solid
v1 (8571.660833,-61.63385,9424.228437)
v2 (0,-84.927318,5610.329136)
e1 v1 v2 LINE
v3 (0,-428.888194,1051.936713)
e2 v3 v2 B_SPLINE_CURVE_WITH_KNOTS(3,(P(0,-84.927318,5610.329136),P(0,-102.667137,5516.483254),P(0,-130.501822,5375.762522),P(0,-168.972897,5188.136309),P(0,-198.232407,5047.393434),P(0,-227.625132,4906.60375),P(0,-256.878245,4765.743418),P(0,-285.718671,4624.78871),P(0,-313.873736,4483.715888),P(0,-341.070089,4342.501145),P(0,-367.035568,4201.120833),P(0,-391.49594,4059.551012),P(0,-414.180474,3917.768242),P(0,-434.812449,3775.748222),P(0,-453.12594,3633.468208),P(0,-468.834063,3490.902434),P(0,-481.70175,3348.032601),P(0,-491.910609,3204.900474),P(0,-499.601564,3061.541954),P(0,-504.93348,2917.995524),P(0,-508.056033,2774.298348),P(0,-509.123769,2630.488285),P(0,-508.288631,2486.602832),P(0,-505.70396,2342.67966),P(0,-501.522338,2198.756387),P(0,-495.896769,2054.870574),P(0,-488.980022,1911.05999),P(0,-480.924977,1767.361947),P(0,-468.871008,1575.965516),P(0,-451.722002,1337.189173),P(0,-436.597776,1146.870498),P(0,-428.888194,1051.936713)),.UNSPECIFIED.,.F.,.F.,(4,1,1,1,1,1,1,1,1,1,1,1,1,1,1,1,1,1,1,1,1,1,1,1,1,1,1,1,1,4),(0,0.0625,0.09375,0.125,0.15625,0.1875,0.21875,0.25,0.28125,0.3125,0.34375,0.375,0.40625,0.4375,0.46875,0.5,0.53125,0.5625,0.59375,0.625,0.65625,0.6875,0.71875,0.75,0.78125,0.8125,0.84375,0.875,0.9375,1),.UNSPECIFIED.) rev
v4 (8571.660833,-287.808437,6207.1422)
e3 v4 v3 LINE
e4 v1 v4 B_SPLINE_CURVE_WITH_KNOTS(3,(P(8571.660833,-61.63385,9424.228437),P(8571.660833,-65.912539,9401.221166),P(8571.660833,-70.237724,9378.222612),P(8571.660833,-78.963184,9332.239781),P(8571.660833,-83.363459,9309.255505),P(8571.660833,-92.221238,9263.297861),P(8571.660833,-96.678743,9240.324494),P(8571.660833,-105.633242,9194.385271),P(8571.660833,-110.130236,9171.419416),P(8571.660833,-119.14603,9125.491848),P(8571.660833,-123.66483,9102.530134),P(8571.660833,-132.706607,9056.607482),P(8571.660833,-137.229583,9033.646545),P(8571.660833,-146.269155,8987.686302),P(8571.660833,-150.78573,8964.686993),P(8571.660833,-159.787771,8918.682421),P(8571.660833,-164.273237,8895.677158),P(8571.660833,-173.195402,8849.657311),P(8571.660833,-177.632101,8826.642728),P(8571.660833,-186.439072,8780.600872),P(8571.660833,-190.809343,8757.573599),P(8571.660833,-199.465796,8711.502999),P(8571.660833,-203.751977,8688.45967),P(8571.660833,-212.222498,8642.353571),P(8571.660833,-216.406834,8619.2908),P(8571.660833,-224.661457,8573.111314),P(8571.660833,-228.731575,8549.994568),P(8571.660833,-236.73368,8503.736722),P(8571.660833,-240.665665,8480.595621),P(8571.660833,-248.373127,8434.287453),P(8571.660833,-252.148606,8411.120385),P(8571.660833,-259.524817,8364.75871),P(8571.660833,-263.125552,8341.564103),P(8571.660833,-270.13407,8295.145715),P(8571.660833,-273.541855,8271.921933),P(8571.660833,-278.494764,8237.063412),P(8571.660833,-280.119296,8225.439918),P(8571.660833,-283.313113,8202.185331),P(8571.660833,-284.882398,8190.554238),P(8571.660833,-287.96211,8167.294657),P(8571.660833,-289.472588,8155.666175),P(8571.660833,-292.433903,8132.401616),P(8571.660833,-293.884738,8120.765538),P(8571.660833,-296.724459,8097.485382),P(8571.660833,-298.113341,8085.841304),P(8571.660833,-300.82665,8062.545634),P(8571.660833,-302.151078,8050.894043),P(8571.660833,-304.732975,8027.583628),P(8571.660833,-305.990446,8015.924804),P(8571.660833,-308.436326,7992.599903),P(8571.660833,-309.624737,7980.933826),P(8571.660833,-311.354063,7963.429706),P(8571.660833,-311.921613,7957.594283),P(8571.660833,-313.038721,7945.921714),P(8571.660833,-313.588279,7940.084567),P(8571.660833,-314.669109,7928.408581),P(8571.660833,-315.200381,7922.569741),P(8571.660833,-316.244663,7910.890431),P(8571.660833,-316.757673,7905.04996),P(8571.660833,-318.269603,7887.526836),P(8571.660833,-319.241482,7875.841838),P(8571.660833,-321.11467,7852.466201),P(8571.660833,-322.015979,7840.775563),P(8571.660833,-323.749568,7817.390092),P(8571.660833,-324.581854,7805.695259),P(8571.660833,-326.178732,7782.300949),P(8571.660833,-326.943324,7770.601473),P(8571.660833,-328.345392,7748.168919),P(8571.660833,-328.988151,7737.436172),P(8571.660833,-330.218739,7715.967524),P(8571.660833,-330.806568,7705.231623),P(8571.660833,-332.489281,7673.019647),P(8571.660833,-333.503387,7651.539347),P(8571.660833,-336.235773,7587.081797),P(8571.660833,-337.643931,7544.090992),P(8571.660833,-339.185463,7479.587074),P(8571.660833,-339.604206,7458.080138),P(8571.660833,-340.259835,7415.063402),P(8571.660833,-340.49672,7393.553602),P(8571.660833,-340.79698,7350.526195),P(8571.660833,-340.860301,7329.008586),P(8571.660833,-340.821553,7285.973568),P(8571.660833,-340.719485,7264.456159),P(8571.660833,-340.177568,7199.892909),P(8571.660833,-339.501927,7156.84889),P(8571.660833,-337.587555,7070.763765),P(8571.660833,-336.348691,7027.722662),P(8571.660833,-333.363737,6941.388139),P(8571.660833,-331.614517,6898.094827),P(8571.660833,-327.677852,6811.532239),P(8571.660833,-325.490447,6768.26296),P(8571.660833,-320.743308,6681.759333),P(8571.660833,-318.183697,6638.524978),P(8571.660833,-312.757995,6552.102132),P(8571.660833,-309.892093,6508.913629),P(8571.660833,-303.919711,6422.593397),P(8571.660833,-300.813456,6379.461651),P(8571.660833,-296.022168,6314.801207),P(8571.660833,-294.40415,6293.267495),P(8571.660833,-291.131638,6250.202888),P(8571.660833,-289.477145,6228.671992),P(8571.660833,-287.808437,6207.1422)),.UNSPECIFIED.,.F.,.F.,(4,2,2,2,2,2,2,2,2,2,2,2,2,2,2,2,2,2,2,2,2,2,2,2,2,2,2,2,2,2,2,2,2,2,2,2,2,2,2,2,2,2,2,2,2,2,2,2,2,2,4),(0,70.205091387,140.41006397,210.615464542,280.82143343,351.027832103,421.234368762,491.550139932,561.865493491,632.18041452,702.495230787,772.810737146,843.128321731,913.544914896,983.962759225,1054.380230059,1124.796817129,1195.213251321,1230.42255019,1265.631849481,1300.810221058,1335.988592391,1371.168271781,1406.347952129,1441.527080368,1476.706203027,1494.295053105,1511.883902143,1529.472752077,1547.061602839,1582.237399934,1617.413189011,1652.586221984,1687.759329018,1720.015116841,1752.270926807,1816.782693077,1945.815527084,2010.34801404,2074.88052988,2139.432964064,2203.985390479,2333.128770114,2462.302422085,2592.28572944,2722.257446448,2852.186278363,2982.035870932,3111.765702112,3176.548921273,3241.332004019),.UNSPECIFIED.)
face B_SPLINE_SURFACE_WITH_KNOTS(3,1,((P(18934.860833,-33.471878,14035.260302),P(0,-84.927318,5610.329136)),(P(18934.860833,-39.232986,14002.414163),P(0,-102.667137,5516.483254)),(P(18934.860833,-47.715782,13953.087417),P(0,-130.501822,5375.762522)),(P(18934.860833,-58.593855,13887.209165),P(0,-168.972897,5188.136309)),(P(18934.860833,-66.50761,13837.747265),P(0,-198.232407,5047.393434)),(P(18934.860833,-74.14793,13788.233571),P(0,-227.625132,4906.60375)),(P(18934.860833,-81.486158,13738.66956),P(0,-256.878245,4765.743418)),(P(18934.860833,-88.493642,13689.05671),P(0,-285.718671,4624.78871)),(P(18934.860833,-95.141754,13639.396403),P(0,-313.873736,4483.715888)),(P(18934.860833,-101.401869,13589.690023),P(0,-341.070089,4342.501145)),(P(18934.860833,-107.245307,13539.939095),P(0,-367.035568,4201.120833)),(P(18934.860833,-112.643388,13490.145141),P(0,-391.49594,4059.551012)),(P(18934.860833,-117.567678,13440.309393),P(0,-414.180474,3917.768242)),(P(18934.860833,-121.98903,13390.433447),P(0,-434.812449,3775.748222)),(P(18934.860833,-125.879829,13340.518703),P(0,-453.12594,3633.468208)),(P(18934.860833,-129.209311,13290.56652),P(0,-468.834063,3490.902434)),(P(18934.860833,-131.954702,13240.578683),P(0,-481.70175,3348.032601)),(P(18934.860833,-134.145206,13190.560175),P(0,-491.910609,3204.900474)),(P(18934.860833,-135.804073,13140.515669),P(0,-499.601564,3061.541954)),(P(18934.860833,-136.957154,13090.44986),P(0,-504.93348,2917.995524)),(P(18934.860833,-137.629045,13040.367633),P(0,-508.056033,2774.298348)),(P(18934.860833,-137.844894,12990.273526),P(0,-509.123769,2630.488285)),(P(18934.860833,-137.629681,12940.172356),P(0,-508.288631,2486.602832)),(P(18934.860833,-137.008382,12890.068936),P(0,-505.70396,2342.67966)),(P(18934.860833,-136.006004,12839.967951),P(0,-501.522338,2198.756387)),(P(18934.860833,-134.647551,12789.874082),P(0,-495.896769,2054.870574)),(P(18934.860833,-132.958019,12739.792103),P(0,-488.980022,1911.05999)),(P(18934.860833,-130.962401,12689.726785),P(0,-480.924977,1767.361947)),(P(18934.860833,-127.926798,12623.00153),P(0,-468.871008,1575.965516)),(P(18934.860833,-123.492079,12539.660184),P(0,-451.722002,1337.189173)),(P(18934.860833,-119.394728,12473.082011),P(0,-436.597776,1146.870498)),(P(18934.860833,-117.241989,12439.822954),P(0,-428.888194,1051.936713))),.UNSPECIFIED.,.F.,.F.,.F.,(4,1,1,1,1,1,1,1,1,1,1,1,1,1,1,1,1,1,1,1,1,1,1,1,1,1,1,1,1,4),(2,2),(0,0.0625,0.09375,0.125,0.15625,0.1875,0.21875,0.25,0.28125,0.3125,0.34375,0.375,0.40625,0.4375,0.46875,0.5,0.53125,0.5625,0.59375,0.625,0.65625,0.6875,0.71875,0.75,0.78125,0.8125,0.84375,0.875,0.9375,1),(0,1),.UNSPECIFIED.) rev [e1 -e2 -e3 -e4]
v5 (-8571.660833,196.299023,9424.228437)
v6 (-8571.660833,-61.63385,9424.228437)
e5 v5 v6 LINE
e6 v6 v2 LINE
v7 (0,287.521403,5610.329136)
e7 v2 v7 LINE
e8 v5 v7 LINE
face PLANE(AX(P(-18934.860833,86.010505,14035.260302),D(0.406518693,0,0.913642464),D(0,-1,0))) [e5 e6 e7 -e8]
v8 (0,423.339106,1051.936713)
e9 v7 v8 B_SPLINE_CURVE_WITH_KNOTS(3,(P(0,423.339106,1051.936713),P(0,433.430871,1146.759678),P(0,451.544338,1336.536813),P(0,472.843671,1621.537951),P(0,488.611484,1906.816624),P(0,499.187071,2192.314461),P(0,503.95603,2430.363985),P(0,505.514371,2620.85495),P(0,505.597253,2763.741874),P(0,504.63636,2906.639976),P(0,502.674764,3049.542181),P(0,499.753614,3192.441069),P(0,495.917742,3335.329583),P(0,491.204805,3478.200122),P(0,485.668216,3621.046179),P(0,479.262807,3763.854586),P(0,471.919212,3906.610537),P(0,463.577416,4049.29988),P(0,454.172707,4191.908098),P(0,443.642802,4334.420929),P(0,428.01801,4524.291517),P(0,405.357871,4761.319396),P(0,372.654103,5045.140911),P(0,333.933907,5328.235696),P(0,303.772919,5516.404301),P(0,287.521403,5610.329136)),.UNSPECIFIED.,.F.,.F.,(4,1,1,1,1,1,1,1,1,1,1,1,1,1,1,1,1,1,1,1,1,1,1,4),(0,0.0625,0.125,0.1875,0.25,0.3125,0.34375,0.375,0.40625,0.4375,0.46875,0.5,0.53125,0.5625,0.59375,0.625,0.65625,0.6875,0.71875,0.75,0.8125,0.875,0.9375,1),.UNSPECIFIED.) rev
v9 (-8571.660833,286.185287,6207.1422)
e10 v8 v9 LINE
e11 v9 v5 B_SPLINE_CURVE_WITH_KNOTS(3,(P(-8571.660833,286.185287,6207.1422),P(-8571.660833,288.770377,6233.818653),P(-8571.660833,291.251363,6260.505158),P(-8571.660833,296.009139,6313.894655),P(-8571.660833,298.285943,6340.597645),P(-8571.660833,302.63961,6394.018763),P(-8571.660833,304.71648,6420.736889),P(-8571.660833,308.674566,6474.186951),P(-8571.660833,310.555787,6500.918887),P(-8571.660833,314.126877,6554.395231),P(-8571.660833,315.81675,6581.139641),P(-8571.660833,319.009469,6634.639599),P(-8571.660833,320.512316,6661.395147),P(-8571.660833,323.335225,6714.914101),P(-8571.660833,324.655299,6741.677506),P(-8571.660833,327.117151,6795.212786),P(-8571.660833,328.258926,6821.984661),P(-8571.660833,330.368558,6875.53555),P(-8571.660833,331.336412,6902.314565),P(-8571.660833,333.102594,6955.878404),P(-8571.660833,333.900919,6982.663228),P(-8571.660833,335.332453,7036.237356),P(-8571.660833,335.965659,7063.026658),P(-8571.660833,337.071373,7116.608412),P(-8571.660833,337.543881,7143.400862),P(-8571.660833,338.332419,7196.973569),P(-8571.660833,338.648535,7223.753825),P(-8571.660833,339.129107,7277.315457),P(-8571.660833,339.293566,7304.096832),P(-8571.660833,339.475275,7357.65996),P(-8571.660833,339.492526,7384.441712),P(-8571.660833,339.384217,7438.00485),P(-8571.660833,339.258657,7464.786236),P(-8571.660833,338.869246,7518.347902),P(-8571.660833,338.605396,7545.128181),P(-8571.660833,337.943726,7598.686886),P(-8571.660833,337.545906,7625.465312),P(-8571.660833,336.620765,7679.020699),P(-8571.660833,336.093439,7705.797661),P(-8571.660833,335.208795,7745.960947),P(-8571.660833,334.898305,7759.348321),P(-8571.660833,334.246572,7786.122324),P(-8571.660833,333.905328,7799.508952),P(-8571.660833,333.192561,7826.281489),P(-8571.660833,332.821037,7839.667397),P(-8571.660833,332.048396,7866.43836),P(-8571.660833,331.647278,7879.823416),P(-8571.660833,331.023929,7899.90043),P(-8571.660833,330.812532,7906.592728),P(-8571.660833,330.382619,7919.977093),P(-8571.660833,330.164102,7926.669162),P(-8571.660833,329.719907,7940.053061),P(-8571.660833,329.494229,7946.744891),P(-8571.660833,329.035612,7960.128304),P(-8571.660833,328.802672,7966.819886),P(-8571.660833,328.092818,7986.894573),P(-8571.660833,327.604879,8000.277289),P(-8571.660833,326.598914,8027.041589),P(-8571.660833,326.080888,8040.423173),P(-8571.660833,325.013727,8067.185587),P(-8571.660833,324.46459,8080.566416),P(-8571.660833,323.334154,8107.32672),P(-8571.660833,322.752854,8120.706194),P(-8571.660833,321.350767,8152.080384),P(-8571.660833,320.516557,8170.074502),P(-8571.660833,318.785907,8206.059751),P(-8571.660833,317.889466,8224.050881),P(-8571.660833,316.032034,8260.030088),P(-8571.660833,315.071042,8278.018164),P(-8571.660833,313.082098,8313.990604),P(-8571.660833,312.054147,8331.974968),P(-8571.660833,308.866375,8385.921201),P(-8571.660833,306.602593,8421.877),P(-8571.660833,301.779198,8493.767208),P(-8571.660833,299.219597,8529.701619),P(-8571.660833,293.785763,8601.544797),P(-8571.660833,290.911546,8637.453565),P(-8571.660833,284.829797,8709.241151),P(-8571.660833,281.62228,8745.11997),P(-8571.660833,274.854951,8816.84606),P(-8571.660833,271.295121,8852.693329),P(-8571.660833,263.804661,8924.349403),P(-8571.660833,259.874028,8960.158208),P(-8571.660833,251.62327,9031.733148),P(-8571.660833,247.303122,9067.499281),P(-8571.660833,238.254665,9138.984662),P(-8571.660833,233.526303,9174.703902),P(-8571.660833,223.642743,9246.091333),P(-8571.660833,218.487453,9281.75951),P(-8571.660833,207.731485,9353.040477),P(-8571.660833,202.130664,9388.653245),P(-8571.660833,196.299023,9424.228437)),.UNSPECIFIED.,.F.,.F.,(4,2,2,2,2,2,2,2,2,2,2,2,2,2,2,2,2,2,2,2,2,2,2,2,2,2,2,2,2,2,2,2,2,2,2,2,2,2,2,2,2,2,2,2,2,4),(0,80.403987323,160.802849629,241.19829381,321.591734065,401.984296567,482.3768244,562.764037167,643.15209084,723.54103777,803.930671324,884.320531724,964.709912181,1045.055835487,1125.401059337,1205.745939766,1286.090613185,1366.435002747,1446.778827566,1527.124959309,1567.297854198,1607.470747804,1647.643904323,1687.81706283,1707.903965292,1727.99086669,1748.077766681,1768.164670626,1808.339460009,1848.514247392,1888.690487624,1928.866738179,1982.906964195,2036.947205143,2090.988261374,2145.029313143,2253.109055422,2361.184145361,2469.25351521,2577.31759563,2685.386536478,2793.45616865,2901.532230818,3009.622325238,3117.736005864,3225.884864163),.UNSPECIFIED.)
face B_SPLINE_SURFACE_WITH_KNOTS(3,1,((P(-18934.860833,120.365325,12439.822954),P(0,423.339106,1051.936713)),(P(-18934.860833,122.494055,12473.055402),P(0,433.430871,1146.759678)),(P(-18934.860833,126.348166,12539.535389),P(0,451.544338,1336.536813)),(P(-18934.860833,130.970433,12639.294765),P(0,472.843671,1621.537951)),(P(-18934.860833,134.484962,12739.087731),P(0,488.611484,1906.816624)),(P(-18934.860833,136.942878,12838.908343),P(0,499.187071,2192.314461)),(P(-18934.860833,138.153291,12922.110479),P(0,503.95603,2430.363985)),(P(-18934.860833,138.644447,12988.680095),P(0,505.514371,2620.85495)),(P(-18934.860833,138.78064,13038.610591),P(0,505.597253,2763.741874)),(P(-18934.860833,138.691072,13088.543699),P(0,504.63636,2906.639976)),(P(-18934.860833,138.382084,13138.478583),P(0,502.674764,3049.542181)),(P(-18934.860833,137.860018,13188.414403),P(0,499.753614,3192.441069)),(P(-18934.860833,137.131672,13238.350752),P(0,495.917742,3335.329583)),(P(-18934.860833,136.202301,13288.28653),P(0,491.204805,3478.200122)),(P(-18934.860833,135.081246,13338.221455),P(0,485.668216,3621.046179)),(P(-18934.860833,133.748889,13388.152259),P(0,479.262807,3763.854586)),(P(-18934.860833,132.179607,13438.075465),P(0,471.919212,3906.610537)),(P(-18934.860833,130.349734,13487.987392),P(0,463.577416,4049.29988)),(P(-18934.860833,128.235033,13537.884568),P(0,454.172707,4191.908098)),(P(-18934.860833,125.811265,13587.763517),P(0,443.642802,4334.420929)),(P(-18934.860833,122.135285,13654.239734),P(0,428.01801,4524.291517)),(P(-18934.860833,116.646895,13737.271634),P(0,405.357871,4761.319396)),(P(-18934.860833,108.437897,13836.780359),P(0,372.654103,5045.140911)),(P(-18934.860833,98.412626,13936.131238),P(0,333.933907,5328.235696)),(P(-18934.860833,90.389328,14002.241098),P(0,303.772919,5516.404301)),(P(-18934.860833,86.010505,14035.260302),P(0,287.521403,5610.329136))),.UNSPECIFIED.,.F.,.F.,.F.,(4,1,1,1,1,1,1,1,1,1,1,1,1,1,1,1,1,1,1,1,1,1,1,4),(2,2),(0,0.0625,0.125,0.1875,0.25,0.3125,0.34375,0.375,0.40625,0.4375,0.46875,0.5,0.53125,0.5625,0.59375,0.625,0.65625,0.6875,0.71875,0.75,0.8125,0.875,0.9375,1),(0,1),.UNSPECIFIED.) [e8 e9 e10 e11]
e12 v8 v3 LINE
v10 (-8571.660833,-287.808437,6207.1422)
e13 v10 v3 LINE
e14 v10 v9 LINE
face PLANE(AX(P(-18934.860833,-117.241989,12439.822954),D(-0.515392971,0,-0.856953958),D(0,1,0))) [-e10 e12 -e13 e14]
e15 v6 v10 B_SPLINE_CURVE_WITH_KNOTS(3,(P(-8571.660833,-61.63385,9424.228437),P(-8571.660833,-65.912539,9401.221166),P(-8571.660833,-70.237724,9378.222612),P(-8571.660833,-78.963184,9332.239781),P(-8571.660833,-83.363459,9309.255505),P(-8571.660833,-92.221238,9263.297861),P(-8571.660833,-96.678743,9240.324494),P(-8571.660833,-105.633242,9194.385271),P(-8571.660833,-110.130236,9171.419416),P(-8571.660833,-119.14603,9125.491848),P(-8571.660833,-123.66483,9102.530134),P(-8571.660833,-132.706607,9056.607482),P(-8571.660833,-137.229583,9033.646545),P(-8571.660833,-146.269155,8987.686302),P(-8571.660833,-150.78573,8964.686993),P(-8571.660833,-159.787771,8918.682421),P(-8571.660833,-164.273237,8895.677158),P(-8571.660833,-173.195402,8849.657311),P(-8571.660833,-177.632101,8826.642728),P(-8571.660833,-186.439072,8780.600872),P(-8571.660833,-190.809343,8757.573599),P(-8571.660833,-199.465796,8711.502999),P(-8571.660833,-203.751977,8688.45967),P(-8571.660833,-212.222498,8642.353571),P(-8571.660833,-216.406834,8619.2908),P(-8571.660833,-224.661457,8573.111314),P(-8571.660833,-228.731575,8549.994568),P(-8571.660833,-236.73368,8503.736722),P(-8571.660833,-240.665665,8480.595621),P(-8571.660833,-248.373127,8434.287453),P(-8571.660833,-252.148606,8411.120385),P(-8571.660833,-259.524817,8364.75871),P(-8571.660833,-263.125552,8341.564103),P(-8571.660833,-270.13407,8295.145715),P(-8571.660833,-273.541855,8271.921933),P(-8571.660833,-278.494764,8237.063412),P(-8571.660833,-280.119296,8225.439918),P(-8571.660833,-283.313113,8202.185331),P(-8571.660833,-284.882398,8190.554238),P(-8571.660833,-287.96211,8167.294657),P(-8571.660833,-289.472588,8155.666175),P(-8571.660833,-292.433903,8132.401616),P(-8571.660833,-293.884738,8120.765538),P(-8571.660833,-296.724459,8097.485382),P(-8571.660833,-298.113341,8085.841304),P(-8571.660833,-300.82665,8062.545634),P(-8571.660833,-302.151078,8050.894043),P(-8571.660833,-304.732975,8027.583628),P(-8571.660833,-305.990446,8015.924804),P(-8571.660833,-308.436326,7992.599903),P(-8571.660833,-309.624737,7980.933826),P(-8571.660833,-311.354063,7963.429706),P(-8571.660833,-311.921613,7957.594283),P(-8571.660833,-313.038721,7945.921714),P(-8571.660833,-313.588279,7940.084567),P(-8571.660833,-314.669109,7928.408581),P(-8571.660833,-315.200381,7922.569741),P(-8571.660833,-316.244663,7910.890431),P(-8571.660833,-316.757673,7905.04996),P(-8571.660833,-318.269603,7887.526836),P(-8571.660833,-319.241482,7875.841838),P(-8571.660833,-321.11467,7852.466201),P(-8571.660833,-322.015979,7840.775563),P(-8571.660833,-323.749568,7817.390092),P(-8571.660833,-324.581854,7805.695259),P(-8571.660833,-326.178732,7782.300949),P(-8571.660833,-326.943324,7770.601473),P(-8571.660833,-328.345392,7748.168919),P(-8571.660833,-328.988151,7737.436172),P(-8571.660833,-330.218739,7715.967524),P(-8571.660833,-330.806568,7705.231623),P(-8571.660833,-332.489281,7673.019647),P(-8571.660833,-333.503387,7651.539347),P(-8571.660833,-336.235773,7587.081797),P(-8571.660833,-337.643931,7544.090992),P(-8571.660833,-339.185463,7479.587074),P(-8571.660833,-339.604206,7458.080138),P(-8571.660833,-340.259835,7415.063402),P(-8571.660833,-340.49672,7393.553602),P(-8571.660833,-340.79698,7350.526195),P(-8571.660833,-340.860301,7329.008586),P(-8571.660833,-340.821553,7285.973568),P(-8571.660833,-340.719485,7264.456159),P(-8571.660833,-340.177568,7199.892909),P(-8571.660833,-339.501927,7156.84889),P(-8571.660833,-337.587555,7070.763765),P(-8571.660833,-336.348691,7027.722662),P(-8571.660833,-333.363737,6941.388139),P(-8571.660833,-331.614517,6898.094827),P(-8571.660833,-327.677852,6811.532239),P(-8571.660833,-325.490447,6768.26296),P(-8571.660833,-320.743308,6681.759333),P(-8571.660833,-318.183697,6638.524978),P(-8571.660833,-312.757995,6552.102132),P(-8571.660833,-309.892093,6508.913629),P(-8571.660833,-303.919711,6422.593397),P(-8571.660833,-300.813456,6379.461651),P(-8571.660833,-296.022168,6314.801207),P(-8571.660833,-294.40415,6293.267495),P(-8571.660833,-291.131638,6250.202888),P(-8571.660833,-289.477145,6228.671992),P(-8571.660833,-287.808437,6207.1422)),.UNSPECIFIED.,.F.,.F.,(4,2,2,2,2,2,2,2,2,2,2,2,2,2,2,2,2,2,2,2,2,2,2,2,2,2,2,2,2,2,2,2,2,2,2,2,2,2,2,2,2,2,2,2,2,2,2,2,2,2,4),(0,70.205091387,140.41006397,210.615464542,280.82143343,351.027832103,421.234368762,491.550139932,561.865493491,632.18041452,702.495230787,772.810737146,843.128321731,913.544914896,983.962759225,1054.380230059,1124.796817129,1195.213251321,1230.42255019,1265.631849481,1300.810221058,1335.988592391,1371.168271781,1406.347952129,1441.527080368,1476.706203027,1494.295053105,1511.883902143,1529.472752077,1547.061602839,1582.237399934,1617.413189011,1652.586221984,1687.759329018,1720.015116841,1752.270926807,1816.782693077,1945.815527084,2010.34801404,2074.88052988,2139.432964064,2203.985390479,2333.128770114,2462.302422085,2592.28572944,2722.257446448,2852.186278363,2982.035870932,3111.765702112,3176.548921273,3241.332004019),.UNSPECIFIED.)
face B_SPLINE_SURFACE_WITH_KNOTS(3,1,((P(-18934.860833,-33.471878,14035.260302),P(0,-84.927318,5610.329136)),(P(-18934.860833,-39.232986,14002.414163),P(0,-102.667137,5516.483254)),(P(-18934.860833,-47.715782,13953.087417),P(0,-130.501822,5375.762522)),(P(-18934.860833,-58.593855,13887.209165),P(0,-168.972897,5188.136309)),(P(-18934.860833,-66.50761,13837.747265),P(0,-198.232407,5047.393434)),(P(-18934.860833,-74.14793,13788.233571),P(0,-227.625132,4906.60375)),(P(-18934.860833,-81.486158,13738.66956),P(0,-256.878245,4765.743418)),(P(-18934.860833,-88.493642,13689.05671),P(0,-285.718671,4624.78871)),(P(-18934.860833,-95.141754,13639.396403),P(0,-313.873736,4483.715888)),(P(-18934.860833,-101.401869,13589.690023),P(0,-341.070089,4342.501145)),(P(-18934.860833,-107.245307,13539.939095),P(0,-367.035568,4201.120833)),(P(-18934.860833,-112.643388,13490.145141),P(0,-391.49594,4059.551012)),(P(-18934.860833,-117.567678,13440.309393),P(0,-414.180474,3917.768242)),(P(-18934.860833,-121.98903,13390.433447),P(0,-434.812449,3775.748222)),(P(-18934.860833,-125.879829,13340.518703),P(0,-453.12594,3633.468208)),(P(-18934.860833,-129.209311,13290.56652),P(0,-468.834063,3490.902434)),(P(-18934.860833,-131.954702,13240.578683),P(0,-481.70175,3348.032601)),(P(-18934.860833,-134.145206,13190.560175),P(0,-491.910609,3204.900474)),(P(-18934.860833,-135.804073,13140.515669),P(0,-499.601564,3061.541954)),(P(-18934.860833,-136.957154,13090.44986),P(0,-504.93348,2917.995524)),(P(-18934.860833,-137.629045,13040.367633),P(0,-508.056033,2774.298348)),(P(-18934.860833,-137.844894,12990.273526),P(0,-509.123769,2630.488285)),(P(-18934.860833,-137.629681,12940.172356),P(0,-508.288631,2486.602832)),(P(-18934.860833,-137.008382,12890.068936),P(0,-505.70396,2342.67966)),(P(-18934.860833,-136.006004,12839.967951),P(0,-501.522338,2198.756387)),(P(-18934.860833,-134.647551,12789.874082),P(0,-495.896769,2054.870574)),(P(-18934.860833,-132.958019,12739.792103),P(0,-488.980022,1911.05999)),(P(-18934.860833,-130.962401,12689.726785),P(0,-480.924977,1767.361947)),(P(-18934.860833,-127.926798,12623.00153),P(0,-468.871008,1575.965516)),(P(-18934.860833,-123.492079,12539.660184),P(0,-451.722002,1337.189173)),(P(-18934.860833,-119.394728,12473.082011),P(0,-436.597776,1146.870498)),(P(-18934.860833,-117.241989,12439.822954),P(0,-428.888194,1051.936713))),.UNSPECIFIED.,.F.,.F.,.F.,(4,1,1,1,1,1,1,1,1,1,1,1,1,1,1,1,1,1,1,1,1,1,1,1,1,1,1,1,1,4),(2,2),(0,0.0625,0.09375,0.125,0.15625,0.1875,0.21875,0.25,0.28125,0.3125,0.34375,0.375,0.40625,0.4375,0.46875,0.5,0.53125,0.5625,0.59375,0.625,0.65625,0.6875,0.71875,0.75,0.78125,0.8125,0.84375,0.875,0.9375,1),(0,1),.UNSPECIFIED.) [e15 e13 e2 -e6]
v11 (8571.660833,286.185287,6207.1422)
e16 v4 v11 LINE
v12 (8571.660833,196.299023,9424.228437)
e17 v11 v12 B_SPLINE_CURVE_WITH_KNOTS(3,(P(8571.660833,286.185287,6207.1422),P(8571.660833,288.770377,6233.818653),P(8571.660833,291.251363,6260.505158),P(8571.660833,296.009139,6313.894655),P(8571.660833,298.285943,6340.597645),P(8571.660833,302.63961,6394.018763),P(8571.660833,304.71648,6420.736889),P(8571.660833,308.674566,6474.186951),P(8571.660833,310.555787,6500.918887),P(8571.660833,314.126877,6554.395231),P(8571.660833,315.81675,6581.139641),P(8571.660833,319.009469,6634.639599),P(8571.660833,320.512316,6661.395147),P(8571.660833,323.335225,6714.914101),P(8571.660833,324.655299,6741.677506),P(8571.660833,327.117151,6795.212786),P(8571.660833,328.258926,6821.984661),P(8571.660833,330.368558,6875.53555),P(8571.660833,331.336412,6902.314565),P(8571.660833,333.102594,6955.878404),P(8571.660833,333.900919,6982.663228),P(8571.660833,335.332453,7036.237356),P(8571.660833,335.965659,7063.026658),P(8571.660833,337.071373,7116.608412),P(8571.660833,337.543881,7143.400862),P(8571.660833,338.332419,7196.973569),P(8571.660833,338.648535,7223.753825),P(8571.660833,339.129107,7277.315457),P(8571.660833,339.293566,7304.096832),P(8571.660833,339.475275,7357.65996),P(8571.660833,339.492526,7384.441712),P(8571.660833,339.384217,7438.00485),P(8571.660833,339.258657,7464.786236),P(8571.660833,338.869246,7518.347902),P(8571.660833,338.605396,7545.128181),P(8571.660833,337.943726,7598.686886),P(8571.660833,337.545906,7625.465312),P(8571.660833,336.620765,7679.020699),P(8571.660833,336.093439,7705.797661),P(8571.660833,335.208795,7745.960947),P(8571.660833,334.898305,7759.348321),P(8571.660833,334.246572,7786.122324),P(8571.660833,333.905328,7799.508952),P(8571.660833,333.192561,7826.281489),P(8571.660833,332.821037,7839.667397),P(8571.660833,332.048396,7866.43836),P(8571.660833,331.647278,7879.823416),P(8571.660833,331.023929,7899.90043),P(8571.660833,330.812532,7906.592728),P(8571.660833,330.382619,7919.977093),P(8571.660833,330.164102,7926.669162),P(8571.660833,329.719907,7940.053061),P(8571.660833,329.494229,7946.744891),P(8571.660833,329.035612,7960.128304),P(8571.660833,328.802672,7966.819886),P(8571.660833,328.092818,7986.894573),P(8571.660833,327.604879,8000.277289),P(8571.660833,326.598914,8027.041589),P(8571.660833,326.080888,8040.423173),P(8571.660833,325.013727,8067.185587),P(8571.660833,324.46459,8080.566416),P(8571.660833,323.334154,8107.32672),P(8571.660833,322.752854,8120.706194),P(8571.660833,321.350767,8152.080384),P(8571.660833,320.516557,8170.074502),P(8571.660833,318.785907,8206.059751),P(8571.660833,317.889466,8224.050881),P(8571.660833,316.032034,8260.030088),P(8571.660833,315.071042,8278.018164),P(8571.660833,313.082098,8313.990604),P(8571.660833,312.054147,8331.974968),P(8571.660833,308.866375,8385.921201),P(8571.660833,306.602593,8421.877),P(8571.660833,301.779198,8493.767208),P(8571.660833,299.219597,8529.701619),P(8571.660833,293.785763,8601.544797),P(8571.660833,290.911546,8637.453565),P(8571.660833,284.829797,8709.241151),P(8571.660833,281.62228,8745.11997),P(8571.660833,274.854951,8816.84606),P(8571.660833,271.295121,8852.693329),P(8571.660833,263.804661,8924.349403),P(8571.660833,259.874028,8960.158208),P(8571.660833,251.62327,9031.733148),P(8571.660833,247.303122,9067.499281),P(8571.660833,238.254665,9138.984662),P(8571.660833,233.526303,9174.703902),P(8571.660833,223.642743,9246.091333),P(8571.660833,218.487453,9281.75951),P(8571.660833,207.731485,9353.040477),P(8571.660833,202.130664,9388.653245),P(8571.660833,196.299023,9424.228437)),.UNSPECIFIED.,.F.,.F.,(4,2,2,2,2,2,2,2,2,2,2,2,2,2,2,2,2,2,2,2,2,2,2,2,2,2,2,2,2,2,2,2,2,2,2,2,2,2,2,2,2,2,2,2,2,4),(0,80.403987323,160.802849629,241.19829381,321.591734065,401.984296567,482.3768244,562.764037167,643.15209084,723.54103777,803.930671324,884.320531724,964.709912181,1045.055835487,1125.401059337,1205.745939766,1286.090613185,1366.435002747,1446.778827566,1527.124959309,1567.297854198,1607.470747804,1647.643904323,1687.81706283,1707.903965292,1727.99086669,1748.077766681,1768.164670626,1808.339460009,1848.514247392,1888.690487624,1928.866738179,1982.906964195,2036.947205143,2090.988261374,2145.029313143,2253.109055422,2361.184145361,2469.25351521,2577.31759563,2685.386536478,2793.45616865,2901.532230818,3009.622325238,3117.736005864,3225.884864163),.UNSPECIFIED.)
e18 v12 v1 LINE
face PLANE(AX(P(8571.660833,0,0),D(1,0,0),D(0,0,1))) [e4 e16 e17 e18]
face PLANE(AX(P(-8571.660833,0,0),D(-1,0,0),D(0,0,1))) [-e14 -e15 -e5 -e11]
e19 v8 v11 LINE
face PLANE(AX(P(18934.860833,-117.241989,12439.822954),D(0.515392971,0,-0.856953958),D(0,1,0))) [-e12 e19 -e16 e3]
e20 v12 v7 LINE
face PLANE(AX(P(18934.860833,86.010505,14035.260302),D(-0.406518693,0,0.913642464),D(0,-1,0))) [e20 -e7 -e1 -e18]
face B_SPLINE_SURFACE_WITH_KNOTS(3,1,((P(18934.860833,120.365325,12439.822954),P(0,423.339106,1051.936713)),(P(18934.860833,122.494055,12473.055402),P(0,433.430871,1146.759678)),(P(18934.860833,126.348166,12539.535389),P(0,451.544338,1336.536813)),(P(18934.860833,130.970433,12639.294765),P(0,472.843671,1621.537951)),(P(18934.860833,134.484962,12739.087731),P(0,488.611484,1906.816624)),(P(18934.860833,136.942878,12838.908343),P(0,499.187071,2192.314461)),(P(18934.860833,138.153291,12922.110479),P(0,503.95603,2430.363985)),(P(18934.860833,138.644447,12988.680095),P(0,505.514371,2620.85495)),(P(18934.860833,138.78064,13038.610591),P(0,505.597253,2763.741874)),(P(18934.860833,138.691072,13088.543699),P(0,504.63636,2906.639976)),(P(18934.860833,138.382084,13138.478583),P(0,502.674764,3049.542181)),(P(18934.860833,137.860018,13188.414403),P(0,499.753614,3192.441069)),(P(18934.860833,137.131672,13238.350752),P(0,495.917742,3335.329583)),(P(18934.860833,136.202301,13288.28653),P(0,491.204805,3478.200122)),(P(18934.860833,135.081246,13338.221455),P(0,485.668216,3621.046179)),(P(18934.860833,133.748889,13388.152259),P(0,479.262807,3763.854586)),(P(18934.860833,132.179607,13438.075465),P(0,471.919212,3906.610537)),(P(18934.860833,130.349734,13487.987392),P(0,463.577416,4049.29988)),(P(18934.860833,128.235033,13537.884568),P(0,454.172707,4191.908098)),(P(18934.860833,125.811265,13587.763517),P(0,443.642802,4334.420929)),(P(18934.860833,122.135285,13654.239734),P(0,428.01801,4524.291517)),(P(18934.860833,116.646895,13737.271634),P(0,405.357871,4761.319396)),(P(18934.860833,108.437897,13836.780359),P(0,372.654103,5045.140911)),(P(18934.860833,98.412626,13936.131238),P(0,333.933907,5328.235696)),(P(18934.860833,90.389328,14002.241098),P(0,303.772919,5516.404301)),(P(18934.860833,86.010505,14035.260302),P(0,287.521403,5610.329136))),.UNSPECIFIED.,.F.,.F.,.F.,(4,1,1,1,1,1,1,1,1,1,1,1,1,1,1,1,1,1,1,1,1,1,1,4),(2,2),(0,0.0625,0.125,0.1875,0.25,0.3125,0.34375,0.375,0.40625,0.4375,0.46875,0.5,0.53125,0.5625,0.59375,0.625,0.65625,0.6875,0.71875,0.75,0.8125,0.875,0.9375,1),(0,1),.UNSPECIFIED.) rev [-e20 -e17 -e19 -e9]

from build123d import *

# Parameters (mm, degrees)
SKETCH4_W          = 14453.89622635
SKETCH4_H          = 1933.47388346
CUT_EXTRUDE1_DEPTH = 10363.2


with BuildPart() as part:
    # Surface-Knit3: read off the stored shape, not the designer's step
    # Surface-Knit3: loft between two sections, ruled curve by curve
    surface_knit3_from = [
        Edge.make_bspline([(-18934.86083303, -33.471877701, 14035.260302209), (-18934.86083303, -39.232985839, 14002.414162771), (-18934.86083303, -47.715782252, 13953.087416618), (-18934.86083303, -58.593854823, 13887.209164739), (-18934.86083303, -66.507610448, 13837.747264713), (-18934.86083303, -74.147929788, 13788.233570957), (-18934.86083303, -81.486158392, 13738.669560406), (-18934.86083303, -88.493641805, 13689.05671), (-18934.86083303, -95.141754057, 13639.396403204), (-18934.86083303, -101.401869176, 13589.690023484), (-18934.86083303, -107.245307184, 13539.93909477), (-18934.86083303, -112.643388102, 13490.145140997), (-18934.86083303, -117.567678303, 13440.309392829), (-18934.86083303, -121.989029798, 13390.433447384), (-18934.86083303, -125.879828529, 13340.518702968), (-18934.86083303, -129.209310817, 13290.566519876), (-18934.86083303, -131.954702468, 13240.578682825), (-18934.86083303, -134.14520626, 13190.560174508), (-18934.86083303, -135.804072585, 13140.515669307), (-18934.86083303, -136.957154136, 13090.449860186), (-18934.86083303, -137.629044966, 13040.367632538), (-18934.86083303, -137.844894397, 12990.273526261), (-18934.86083303, -137.629680637, 12940.172355997), (-18934.86083303, -137.008381893, 12890.068936387), (-18934.86083303, -136.006003569, 12839.967950624), (-18934.86083303, -134.647551066, 12789.874081899), (-18934.86083303, -132.95801886, 12739.792102688), (-18934.86083303, -130.962401424, 12689.726785468), (-18934.86083303, -127.926797655, 12623.001530101), (-18934.86083303, -123.492079064, 12539.660184396), (-18934.86083303, -119.394727721, 12473.082010903), (-18934.86083303, -117.241989306, 12439.822954241)], [0, 0, 0, 0, 0.0625, 0.09375, 0.125, 0.15625, 0.1875, 0.21875, 0.25, 0.28125, 0.3125, 0.34375, 0.375, 0.40625, 0.4375, 0.46875, 0.5, 0.53125, 0.5625, 0.59375, 0.625, 0.65625, 0.6875, 0.71875, 0.75, 0.78125, 0.8125, 0.84375, 0.875, 0.9375, 1, 1, 1, 1], 3),
        Edge.make_bspline([(-18934.86083303, 120.365325484, 12439.822954241), (-18934.86083303, 122.494054894, 12473.055401614), (-18934.86083303, 126.348166334, 12539.535389158), (-18934.86083303, 130.970433248, 12639.294765427), (-18934.86083303, 134.484961546, 12739.087731356), (-18934.86083303, 136.942878492, 12838.90834322), (-18934.86083303, 138.15329091, 12922.110479008), (-18934.86083303, 138.644447388, 12988.680095077), (-18934.86083303, 138.780640496, 13038.61059056), (-18934.86083303, 138.691071829, 13088.543699188), (-18934.86083303, 138.382083573, 13138.478582735), (-18934.86083303, 137.860017912, 13188.414402975), (-18934.86083303, 137.131671681, 13238.350752055), (-18934.86083303, 136.20230149, 13288.286529831), (-18934.86083303, 135.081246142, 13338.221455349), (-18934.86083303, 133.748889114, 13388.152259432), (-18934.86083303, 132.179607267, 13438.075464594), (-18934.86083303, 130.34973447, 13487.987392083), (-18934.86083303, 128.235032848, 13537.884567717), (-18934.86083303, 125.811264523, 13587.763517313), (-18934.86083303, 122.135284813, 13654.239733934), (-18934.86083303, 116.646894642, 13737.271634153), (-18934.86083303, 108.437897072, 13836.780359182), (-18934.86083303, 98.412625908, 13936.131237745), (-18934.86083303, 90.38932828, 14002.241097744), (-18934.86083303, 86.010505038, 14035.260302209)], [0, 0, 0, 0, 0.0625, 0.125, 0.1875, 0.25, 0.3125, 0.34375, 0.375, 0.40625, 0.4375, 0.46875, 0.5, 0.53125, 0.5625, 0.59375, 0.625, 0.65625, 0.6875, 0.71875, 0.75, 0.8125, 0.875, 0.9375, 1, 1, 1, 1], 3),
        Edge.make_line((-18934.86083303, -117.241989306, 12439.822954241), (-18934.86083303, 120.365325484, 12439.822954241)),
        Edge.make_line((-18934.86083303, 86.010505038, 14035.260302209), (-18934.86083303, -33.471877701, 14035.260302209)),
    ]
    surface_knit3_to = [
        Edge.make_bspline([(0, -84.927317993, 5610.329135713), (0, -102.667137494, 5516.48325358), (0, -130.501822373, 5375.762521563), (0, -168.972896676, 5188.136309302), (0, -198.232407134, 5047.393433635), (0, -227.625131997, 4906.603749811), (0, -256.878244625, 4765.74341763), (0, -285.718671343, 4624.788710261), (0, -313.873736057, 4483.715887809), (0, -341.07008869, 4342.501145232), (0, -367.035568499, 4201.120833355), (0, -391.495939954, 4059.551011763), (0, -414.1804739, 3917.768241677), (0, -434.812449325, 3775.748222394), (0, -453.125940488, 3633.46820848), (0, -468.834062649, 3490.902433673), (0, -481.70175033, 3348.032601241), (0, -491.910608802, 3204.9004744), (0, -499.601564269, 3061.54195392), (0, -504.933479647, 2917.995523713), (0, -508.056032589, 2774.298348093), (0, -509.12376877, 2630.488284808), (0, -508.288630683, 2486.60283187), (0, -505.703960256, 2342.679659676), (0, -501.522338107, 2198.756386936), (0, -495.896769336, 2054.870573581), (0, -488.980021681, 1911.059989844), (0, -480.924976797, 1767.361947417), (0, -468.871008063, 1575.96551596), (0, -451.722002387, 1337.189173494), (0, -436.597775788, 1146.870498433), (0, -428.888194187, 1051.936712946)], [0, 0, 0, 0, 0.0625, 0.09375, 0.125, 0.15625, 0.1875, 0.21875, 0.25, 0.28125, 0.3125, 0.34375, 0.375, 0.40625, 0.4375, 0.46875, 0.5, 0.53125, 0.5625, 0.59375, 0.625, 0.65625, 0.6875, 0.71875, 0.75, 0.78125, 0.8125, 0.84375, 0.875, 0.9375, 1, 1, 1, 1], 3),
        Edge.make_bspline([(0, 423.339106489, 1051.936712946), (0, 433.430870807, 1146.759677835), (0, 451.544338374, 1336.536812968), (0, 472.84367101, 1621.537950643), (0, 488.611484269, 1906.81662352), (0, 499.187071227, 2192.314460642), (0, 503.956030141, 2430.36398482), (0, 505.514370769, 2620.854949524), (0, 505.597253239, 2763.741874097), (0, 504.636359826, 2906.63997626), (0, 502.674763974, 3049.542181379), (0, 499.753613675, 3192.441068828), (0, 495.917742322, 3335.329582719), (0, 491.204804542, 3478.200122358), (0, 485.668215769, 3621.046179455), (0, 479.262806583, 3763.854585812), (0, 471.919211522, 3906.610536852), (0, 463.577416428, 4049.299879622), (0, 454.172707472, 4191.908098118), (0, 443.642802113, 4334.420929134), (0, 428.018010365, 4524.291516807), (0, 405.357871452, 4761.319395858), (0, 372.654103084, 5045.140911431), (0, 333.933906588, 5328.235696321), (0, 303.772919031, 5516.404301316), (0, 287.521402652, 5610.329135713)], [0, 0, 0, 0, 0.0625, 0.125, 0.1875, 0.25, 0.3125, 0.34375, 0.375, 0.40625, 0.4375, 0.46875, 0.5, 0.53125, 0.5625, 0.59375, 0.625, 0.65625, 0.6875, 0.71875, 0.75, 0.8125, 0.875, 0.9375, 1, 1, 1, 1], 3),
        Edge.make_line((0, -428.888194187, 1051.936712946), (0, 423.339106489, 1051.936712946)),
        Edge.make_line((0, 287.521402652, 5610.329135713), (0, -84.927317993, 5610.329135713)),
    ]
    surface_knit3 = Solid(Shell([*[Face.make_surface_from_curves(surface_knit3_from[k], surface_knit3_to[k]) for k in range(4)], Face(Wire(surface_knit3_from)), Face(Wire(surface_knit3_to))]))
    add(surface_knit3)

    # Sketch4 → Cut-Extrude1 (cut)
    with BuildSketch(Plane(origin=(-18934.86083303, 0, 0), x_dir=(0, 0, -1), z_dir=(1, 0, 0))):
        with Locations((-7774.786517892, 36.739287504)):
            Rectangle(SKETCH4_W, SKETCH4_H)
    extrude(amount=CUT_EXTRUDE1_DEPTH, mode=Mode.SUBTRACT)

    # Mirror1: part across plane


with BuildPart() as part_1:
    add(part.part)
    add(part.part.mirror(Plane(origin=(0, 0, 0), x_dir=(0, 0, 1), z_dir=(1, 0, 0))))


solid = part_1.part
